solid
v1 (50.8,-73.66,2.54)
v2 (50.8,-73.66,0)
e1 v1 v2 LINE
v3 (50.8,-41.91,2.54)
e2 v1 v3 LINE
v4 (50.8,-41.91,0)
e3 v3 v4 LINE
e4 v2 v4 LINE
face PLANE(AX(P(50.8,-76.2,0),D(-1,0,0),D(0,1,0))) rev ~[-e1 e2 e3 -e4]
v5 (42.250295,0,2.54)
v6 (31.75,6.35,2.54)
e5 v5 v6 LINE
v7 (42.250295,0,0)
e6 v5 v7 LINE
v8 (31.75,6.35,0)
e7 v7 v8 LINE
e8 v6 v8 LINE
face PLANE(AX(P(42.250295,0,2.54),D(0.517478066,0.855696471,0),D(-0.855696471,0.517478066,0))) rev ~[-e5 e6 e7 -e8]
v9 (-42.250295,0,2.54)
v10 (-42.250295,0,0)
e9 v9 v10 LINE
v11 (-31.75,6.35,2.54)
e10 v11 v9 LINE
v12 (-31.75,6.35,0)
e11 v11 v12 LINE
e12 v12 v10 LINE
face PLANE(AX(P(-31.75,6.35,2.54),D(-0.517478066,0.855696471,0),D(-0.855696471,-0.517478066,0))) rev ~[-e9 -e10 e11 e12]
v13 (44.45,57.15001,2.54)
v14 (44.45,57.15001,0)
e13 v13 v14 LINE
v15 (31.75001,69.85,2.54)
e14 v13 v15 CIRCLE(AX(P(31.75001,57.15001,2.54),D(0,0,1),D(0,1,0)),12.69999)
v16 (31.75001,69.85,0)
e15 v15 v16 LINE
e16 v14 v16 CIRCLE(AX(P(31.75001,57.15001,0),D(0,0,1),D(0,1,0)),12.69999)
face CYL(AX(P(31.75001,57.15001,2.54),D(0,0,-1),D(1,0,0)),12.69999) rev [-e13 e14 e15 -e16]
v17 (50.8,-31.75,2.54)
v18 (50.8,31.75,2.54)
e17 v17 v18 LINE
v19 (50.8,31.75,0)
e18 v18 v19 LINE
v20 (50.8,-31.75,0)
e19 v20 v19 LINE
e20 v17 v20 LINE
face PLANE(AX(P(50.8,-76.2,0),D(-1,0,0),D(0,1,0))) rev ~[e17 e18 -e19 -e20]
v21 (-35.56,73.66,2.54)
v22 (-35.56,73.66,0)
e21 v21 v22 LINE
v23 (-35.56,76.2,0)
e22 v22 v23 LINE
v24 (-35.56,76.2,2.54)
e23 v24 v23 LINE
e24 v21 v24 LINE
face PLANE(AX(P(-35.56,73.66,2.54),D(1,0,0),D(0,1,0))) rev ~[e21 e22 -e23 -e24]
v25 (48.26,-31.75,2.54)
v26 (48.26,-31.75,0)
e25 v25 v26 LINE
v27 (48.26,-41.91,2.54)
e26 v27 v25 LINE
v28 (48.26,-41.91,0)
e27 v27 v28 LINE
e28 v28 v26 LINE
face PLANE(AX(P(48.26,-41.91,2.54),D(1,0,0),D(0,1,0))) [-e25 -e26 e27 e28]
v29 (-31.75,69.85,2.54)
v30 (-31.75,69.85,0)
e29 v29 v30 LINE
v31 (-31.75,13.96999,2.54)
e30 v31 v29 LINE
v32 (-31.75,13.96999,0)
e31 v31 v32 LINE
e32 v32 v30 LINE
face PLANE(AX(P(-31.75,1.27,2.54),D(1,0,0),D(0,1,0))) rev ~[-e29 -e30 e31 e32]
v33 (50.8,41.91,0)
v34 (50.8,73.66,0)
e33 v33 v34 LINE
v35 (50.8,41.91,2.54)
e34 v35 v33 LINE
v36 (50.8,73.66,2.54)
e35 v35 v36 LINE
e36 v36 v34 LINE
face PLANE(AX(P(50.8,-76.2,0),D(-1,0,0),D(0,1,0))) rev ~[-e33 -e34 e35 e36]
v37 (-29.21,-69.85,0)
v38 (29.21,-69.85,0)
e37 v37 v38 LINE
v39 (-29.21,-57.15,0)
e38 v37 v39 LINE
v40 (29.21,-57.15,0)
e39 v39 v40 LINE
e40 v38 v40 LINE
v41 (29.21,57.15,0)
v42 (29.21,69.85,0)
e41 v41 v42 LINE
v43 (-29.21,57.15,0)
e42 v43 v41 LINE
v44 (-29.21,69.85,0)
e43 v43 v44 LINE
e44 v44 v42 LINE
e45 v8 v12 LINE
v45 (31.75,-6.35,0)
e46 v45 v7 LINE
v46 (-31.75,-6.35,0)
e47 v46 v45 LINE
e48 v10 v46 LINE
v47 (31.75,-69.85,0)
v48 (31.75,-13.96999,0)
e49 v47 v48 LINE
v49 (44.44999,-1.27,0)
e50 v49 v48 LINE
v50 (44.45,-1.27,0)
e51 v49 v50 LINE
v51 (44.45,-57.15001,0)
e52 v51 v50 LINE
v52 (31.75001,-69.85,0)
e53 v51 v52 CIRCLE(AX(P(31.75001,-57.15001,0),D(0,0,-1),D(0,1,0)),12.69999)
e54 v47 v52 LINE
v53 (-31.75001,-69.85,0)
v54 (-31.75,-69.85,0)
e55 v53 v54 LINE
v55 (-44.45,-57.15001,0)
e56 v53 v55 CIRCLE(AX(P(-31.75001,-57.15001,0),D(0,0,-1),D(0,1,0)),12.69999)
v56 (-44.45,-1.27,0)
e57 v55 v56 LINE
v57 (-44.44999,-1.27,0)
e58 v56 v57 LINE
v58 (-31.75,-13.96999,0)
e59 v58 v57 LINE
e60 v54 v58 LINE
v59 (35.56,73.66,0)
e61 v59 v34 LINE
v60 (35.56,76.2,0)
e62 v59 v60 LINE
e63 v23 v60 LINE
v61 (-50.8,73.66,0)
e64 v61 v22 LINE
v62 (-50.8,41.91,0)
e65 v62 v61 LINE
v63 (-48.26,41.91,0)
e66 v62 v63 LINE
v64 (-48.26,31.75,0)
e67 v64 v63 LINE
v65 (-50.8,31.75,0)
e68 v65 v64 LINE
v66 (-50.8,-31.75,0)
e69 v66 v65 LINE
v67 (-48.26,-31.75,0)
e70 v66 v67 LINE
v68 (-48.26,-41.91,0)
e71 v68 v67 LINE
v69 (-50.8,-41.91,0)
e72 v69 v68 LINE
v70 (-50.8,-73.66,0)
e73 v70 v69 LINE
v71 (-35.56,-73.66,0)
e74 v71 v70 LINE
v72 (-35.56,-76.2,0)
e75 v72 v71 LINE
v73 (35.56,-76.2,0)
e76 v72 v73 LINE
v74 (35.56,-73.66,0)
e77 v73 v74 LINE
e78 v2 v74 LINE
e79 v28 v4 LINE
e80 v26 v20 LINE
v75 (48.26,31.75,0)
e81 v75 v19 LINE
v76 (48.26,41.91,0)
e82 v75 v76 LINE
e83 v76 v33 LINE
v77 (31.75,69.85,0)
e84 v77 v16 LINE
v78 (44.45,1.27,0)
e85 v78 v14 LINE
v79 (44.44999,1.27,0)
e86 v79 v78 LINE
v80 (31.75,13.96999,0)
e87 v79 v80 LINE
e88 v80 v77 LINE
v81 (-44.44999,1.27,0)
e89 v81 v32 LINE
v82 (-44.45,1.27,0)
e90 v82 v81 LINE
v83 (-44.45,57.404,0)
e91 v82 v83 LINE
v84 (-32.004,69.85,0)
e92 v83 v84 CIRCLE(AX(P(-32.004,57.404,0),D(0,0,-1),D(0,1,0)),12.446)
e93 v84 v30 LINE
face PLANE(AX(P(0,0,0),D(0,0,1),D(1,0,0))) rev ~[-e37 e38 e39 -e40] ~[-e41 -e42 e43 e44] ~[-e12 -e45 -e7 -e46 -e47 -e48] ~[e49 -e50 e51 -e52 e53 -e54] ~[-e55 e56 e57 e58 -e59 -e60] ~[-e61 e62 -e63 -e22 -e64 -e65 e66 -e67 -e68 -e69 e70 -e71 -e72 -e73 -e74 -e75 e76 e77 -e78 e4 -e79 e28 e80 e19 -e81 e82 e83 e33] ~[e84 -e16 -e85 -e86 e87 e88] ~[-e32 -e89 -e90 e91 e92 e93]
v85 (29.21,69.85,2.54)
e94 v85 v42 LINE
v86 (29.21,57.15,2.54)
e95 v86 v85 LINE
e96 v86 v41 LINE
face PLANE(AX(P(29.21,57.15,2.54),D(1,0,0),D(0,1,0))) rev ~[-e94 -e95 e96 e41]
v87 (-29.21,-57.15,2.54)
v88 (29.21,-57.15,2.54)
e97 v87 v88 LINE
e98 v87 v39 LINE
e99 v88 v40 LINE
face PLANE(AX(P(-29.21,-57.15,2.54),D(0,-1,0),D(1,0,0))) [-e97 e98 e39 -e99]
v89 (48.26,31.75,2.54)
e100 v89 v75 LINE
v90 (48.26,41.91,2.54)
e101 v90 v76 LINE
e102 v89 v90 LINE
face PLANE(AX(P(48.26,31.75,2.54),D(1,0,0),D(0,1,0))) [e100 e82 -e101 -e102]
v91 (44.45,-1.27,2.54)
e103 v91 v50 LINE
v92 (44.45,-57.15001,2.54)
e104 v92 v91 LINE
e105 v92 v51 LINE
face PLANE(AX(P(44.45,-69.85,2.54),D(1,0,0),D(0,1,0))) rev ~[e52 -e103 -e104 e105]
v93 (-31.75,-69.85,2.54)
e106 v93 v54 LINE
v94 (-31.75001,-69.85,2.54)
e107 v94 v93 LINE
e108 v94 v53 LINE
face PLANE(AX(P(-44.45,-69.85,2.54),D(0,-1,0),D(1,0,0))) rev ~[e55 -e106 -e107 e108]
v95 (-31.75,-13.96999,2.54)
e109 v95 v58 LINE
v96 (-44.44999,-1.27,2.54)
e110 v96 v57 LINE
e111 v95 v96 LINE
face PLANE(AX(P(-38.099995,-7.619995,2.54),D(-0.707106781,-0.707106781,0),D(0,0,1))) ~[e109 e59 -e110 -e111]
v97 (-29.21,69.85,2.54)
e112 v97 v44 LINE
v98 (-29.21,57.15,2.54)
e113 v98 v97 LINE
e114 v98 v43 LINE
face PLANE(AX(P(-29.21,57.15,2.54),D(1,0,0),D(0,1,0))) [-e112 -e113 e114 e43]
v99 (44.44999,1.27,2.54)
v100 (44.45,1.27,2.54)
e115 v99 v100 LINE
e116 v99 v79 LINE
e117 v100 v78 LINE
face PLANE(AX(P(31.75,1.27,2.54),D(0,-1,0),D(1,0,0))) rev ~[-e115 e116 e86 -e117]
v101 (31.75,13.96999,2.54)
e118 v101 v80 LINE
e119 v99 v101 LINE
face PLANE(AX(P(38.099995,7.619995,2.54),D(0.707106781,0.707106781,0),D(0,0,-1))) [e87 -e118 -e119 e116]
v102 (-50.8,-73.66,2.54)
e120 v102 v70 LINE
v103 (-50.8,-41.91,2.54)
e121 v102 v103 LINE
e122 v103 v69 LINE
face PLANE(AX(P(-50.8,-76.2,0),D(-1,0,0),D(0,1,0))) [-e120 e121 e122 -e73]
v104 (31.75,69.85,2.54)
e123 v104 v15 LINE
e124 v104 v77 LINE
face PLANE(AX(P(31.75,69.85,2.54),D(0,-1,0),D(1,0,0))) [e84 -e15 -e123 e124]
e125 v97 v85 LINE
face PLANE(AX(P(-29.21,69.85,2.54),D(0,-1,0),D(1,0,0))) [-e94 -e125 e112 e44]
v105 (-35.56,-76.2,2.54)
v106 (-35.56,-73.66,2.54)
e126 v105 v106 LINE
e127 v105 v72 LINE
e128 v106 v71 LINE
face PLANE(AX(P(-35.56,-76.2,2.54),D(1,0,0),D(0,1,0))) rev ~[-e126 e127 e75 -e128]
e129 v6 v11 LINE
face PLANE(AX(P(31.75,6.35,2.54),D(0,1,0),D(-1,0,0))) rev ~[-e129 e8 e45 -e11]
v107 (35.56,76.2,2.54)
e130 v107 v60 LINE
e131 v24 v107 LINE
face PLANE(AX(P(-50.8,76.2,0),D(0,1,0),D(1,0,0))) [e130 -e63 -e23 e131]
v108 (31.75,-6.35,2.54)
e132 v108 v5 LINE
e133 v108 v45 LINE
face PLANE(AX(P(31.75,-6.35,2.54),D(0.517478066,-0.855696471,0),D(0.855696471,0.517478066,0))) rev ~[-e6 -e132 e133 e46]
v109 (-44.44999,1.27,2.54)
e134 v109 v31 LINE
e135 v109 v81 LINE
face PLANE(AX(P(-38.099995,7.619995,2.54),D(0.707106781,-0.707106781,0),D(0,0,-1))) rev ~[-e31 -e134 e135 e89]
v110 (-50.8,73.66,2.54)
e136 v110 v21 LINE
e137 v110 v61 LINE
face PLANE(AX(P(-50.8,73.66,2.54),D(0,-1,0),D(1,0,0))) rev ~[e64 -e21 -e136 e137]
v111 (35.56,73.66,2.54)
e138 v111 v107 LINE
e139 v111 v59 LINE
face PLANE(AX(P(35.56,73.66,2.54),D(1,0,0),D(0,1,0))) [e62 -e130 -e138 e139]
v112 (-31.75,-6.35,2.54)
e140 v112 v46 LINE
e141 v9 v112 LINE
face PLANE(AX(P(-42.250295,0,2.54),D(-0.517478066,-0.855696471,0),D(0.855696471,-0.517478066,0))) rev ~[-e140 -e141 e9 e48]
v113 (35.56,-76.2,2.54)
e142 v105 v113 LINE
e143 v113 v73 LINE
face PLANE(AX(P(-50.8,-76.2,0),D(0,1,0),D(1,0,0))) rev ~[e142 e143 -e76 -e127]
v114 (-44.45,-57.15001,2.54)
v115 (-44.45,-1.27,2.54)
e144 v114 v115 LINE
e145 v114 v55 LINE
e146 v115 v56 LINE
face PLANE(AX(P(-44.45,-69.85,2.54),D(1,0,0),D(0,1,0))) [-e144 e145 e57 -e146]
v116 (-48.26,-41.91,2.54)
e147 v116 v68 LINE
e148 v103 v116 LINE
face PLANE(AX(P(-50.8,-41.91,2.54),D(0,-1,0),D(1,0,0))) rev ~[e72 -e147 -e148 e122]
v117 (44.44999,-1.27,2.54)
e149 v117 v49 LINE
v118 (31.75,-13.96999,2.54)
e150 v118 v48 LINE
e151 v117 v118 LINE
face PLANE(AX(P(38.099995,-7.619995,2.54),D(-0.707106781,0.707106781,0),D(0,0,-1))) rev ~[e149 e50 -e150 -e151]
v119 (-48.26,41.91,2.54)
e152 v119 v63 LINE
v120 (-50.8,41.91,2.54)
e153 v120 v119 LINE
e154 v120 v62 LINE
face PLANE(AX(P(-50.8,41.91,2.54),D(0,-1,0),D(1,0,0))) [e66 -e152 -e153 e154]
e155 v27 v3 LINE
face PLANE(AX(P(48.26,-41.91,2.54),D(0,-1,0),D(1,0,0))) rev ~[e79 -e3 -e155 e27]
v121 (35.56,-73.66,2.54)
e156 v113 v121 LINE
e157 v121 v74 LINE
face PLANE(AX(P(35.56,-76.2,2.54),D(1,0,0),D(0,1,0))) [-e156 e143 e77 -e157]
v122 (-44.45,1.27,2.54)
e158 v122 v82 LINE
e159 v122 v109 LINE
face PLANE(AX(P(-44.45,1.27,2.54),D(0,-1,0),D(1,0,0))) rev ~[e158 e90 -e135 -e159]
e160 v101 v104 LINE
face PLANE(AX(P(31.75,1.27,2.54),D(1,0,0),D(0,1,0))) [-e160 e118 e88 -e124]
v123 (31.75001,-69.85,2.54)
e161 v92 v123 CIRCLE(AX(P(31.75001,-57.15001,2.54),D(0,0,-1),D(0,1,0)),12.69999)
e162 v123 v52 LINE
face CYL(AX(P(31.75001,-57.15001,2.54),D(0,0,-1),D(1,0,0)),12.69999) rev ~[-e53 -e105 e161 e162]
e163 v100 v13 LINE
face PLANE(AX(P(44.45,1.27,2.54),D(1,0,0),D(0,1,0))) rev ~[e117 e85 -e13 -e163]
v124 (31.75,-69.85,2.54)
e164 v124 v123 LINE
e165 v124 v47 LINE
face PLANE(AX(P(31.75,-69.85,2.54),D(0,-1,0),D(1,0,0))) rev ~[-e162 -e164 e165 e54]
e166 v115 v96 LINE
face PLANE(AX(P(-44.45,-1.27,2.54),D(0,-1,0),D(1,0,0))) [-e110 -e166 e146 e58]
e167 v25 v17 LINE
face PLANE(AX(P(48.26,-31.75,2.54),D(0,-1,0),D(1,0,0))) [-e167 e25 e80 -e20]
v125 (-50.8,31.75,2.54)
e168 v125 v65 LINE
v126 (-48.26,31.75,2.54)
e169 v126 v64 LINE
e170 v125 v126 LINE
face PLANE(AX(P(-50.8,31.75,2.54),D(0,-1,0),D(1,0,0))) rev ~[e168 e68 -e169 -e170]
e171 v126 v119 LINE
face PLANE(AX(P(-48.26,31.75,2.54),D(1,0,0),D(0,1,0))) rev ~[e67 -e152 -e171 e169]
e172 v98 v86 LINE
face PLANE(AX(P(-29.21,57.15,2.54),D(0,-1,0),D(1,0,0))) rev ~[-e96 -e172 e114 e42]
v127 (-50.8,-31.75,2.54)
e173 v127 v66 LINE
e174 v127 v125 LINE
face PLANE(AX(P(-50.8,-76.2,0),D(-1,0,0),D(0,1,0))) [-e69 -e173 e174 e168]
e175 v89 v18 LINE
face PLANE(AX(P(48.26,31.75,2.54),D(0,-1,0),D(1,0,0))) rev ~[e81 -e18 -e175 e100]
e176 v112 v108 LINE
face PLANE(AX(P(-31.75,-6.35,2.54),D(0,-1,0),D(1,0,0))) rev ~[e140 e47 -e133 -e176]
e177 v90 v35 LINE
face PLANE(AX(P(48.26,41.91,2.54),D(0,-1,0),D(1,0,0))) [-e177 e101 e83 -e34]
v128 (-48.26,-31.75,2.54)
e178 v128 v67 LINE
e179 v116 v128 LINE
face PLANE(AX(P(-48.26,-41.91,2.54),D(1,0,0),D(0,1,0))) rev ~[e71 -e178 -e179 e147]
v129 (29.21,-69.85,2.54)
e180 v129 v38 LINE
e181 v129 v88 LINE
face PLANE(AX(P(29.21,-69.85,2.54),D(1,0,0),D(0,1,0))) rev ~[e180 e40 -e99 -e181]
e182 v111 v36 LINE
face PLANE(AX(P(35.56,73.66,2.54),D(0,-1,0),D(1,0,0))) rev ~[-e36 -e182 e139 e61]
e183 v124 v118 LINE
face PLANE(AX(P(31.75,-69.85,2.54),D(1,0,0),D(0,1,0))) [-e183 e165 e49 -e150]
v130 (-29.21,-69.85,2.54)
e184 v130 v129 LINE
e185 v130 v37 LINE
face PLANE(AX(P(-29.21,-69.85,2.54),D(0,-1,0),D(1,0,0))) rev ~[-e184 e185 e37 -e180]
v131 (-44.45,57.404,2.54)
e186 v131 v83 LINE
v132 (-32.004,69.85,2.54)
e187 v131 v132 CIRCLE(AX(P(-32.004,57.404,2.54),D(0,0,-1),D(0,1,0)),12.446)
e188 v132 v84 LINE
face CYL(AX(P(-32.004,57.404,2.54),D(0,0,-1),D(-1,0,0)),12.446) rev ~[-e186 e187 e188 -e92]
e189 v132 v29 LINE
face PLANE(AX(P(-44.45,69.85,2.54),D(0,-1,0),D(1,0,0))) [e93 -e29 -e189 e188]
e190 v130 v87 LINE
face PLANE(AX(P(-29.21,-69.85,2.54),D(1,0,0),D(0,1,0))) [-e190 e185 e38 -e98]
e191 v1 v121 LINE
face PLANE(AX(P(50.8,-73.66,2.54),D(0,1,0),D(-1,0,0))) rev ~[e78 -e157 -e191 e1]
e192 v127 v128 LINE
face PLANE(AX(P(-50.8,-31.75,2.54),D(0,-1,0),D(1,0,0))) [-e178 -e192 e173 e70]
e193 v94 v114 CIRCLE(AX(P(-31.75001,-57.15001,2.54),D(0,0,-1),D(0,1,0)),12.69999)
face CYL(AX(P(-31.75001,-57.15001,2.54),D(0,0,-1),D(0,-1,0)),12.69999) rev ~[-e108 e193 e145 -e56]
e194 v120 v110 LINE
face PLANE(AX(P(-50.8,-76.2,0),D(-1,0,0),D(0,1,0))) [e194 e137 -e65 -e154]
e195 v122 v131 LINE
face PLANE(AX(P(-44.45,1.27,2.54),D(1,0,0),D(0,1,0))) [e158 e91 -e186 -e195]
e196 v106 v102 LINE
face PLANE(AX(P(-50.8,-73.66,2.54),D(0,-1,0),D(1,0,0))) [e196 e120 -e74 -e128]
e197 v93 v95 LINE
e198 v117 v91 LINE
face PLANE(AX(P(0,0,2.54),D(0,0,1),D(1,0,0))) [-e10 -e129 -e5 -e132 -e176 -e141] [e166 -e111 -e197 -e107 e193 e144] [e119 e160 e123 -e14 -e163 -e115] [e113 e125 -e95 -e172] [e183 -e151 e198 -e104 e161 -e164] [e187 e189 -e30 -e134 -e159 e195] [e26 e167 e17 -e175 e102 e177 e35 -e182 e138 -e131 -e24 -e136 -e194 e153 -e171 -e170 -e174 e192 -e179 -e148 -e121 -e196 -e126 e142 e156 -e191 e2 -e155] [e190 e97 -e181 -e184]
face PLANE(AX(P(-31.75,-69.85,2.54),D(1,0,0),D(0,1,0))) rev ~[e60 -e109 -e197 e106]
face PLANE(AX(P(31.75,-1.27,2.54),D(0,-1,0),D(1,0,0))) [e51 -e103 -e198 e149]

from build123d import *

# Parameters (mm, degrees)
F0_W      = 101.6
F0_H      = 152.4
F1_DEPTH  = 2.54
F2_W      = 12.7
F2_H      = 68.58
F3_DEPTH  = 2.541
F4_SIZE2  = 12.69999
F4_SIZE   = 12.69999
F5_R      = 12.446
F6_W      = 58.42
F6_H      = 12.7
F7_DEPTH  = 2.541
F8_W      = 12.7
F8_H      = 68.58
F9_DEPTH  = 2.541
F10_R     = 12.69999
F11_SIZE2 = 12.69999
F11_SIZE  = 12.69999
F12_W     = 12.7
F12_H     = 68.58
F13_DEPTH = 2.541
F14_SIZE2 = 12.69999
F14_SIZE  = 12.69999
F15_R     = 12.69999
F16_W     = 12.7
F16_H     = 68.58
F17_DEPTH = 2.541
F18_SIZE2 = 12.69999
F18_SIZE  = 12.69999
F19_R     = 12.69999
F20_W     = 58.42
F20_H     = 12.7
F21_DEPTH = 2.541
F23_DEPTH = 25.4
F25_DEPTH = 25.4
F27_DEPTH = 25.4
F28_W     = 2.54
F28_H     = 10.16
F29_DEPTH = 25.4
F30_W     = 2.54
F30_H     = 10.16
F31_DEPTH = 25.4
F32_W     = 15.24
F32_H     = 2.54
F33_DEPTH = 25.4


# Not quite as in the source:
# - a fillet or chamfer is up to 0.001 mm smaller than in the source, because OpenCascade refuses the exact size


with BuildPart() as f1:
    # F0 (on Top) → F1 (new body)
    with BuildSketch(Plane.XY):
        Rectangle(F0_W, F0_H)
    extrude(amount=F1_DEPTH)

    # F2 (on face) → F3 (cut, through all)
    with BuildSketch(Plane.XY.offset(2.54)):
        with Locations((-38.1, 35.56)):
            Rectangle(F2_W, F2_H)
    extrude(amount=-F3_DEPTH, mode=Mode.SUBTRACT)

    # F4 (size 12.7 and 12.7 in the source; OpenCascade refuses exactly that, so slightly less here)
    f4_edges = [f1.edges().sort_by_distance(p)[0] for p in [
        (-31.75, 1.27, 1.27),
    ]]
    chamfer(f4_edges, length=F4_SIZE, length2=F4_SIZE2)

    # F5
    f5_edges = [f1.edges().sort_by_distance(p)[0] for p in [
        (-44.45, 69.85, 1.27),
    ]]
    fillet(f5_edges, radius=F5_R)

    # F6 (on face) → F7 (cut, through all)
    with BuildSketch(Plane.XY.offset(2.54)):
        with Locations((0, 63.5)):
            Rectangle(F6_W, F6_H)
    extrude(amount=-F7_DEPTH, mode=Mode.SUBTRACT)

    # F8 (on face) → F9 (cut, through all)
    with BuildSketch(Plane.XY.offset(2.54)):
        with Locations((38.1, 35.56)):
            Rectangle(F8_W, F8_H)
    extrude(amount=-F9_DEPTH, mode=Mode.SUBTRACT)

    # F10 (radius 12.7 in the source; OpenCascade refuses exactly that, so slightly less here)
    f10_edges = [f1.edges().sort_by_distance(p)[0] for p in [
        (44.45, 69.85, 1.27),
    ]]
    fillet(f10_edges, radius=F10_R)

    # F11 (size 12.7 and 12.7 in the source; OpenCascade refuses exactly that, so slightly less here)
    f11_edges = [f1.edges().sort_by_distance(p)[0] for p in [
        (31.75, 1.27, 1.27),
    ]]
    chamfer(f11_edges, length=F11_SIZE, length2=F11_SIZE2)

    # F12 (on face) → F13 (cut, through all)
    with BuildSketch(Plane.XY.offset(2.54)):
        with Locations((-38.1, -35.56)):
            Rectangle(F12_W, F12_H)
    extrude(amount=-F13_DEPTH, mode=Mode.SUBTRACT)

    # F14 (size 12.7 and 12.7 in the source; OpenCascade refuses exactly that, so slightly less here)
    f14_edges = [f1.edges().sort_by_distance(p)[0] for p in [
        (-31.75, -1.27, 1.27),
    ]]
    chamfer(f14_edges, length=F14_SIZE, length2=F14_SIZE2)

    # F15 (radius 12.7 in the source; OpenCascade refuses exactly that, so slightly less here)
    f15_edges = [f1.edges().sort_by_distance(p)[0] for p in [
        (-44.45, -69.85, 1.27),
    ]]
    fillet(f15_edges, radius=F15_R)

    # F16 (on face) → F17 (cut, through all)
    with BuildSketch(Plane.XY.offset(2.54)):
        with Locations((38.1, -35.56)):
            Rectangle(F16_W, F16_H)
    extrude(amount=-F17_DEPTH, mode=Mode.SUBTRACT)

    # F18 (size 12.7 and 12.7 in the source; OpenCascade refuses exactly that, so slightly less here)
    f18_edges = [f1.edges().sort_by_distance(p)[0] for p in [
        (31.75, -1.27, 1.27),
    ]]
    chamfer(f18_edges, length=F18_SIZE, length2=F18_SIZE2)

    # F19 (radius 12.7 in the source; OpenCascade refuses exactly that, so slightly less here)
    f19_edges = [f1.edges().sort_by_distance(p)[0] for p in [
        (44.45, -69.85, 1.27),
    ]]
    fillet(f19_edges, radius=F19_R)

    # F20 (on face) → F21 (cut, through all)
    with BuildSketch(Plane.XY.offset(2.54)):
        with Locations((0, -63.5)):
            Rectangle(F20_W, F20_H)
    extrude(amount=-F21_DEPTH, mode=Mode.SUBTRACT)

    # F22 (on face) → F23 (cut)
    with BuildSketch(Plane.XY.offset(2.54)):
        Polygon((-31.75, 6.35), (-42.2502954744, 0), (-31.75, -6.35), (31.75, -6.35), (42.2502954744, 0), (31.75, 6.35), align=None)
    extrude(amount=-F23_DEPTH, mode=Mode.SUBTRACT)

    # F24 (on face) → F25 (cut)
    with BuildSketch(Plane.XY.offset(2.54)):
        Polygon((-50.8, -76.2), (-39.37, -76.2), (-41.91, -73.66), (-50.8, -73.66), align=None)
        Polygon((41.91, -73.66), (39.37, -76.2), (50.8, -76.2), (50.8, -73.66), align=None)
    extrude(amount=-F25_DEPTH, mode=Mode.SUBTRACT)

    # F26 (on face) → F27 (cut)
    with BuildSketch(Plane.XY.offset(2.54)):
        Polygon((-39.37, 76.2), (-50.8, 76.2), (-50.8, 73.66), (-41.91, 73.66), align=None)
        Polygon((50.8, 76.2), (39.37, 76.2), (41.91, 73.66), (50.8, 73.66), align=None)
    extrude(amount=-F27_DEPTH, mode=Mode.SUBTRACT)

    # F28 (on face) → F29 (cut)
    with BuildSketch(Plane.XY.offset(2.54)):
        with Locations((49.53, 36.83)):
            Rectangle(F28_W, F28_H)
        with Locations((49.53, -36.83)):
            Rectangle(F28_W, F28_H)
    extrude(amount=-F29_DEPTH, mode=Mode.SUBTRACT)

    # F30 (on face) → F31 (cut)
    with BuildSketch(Plane.XY.offset(2.54)):
        with Locations((-49.53, 36.83)):
            Rectangle(F30_W, F30_H)
        with Locations((-49.53, -36.83)):
            Rectangle(F30_W, F30_H)
    extrude(amount=-F31_DEPTH, mode=Mode.SUBTRACT)

    # F32 (on face) → F33 (cut)
    with BuildSketch(Plane.XY.offset(2.54)):
        with Locations((-43.18, -74.93)):
            Rectangle(F32_W, F32_H)
        with Locations((43.18, -74.93)):
            Rectangle(F32_W, F32_H)
        with Locations((-43.18, 74.93)):
            Rectangle(F32_W, F32_H)
        with Locations((43.18, 74.93)):
            Rectangle(F32_W, F32_H)
    extrude(amount=-F33_DEPTH, mode=Mode.SUBTRACT)


solid = f1.part
